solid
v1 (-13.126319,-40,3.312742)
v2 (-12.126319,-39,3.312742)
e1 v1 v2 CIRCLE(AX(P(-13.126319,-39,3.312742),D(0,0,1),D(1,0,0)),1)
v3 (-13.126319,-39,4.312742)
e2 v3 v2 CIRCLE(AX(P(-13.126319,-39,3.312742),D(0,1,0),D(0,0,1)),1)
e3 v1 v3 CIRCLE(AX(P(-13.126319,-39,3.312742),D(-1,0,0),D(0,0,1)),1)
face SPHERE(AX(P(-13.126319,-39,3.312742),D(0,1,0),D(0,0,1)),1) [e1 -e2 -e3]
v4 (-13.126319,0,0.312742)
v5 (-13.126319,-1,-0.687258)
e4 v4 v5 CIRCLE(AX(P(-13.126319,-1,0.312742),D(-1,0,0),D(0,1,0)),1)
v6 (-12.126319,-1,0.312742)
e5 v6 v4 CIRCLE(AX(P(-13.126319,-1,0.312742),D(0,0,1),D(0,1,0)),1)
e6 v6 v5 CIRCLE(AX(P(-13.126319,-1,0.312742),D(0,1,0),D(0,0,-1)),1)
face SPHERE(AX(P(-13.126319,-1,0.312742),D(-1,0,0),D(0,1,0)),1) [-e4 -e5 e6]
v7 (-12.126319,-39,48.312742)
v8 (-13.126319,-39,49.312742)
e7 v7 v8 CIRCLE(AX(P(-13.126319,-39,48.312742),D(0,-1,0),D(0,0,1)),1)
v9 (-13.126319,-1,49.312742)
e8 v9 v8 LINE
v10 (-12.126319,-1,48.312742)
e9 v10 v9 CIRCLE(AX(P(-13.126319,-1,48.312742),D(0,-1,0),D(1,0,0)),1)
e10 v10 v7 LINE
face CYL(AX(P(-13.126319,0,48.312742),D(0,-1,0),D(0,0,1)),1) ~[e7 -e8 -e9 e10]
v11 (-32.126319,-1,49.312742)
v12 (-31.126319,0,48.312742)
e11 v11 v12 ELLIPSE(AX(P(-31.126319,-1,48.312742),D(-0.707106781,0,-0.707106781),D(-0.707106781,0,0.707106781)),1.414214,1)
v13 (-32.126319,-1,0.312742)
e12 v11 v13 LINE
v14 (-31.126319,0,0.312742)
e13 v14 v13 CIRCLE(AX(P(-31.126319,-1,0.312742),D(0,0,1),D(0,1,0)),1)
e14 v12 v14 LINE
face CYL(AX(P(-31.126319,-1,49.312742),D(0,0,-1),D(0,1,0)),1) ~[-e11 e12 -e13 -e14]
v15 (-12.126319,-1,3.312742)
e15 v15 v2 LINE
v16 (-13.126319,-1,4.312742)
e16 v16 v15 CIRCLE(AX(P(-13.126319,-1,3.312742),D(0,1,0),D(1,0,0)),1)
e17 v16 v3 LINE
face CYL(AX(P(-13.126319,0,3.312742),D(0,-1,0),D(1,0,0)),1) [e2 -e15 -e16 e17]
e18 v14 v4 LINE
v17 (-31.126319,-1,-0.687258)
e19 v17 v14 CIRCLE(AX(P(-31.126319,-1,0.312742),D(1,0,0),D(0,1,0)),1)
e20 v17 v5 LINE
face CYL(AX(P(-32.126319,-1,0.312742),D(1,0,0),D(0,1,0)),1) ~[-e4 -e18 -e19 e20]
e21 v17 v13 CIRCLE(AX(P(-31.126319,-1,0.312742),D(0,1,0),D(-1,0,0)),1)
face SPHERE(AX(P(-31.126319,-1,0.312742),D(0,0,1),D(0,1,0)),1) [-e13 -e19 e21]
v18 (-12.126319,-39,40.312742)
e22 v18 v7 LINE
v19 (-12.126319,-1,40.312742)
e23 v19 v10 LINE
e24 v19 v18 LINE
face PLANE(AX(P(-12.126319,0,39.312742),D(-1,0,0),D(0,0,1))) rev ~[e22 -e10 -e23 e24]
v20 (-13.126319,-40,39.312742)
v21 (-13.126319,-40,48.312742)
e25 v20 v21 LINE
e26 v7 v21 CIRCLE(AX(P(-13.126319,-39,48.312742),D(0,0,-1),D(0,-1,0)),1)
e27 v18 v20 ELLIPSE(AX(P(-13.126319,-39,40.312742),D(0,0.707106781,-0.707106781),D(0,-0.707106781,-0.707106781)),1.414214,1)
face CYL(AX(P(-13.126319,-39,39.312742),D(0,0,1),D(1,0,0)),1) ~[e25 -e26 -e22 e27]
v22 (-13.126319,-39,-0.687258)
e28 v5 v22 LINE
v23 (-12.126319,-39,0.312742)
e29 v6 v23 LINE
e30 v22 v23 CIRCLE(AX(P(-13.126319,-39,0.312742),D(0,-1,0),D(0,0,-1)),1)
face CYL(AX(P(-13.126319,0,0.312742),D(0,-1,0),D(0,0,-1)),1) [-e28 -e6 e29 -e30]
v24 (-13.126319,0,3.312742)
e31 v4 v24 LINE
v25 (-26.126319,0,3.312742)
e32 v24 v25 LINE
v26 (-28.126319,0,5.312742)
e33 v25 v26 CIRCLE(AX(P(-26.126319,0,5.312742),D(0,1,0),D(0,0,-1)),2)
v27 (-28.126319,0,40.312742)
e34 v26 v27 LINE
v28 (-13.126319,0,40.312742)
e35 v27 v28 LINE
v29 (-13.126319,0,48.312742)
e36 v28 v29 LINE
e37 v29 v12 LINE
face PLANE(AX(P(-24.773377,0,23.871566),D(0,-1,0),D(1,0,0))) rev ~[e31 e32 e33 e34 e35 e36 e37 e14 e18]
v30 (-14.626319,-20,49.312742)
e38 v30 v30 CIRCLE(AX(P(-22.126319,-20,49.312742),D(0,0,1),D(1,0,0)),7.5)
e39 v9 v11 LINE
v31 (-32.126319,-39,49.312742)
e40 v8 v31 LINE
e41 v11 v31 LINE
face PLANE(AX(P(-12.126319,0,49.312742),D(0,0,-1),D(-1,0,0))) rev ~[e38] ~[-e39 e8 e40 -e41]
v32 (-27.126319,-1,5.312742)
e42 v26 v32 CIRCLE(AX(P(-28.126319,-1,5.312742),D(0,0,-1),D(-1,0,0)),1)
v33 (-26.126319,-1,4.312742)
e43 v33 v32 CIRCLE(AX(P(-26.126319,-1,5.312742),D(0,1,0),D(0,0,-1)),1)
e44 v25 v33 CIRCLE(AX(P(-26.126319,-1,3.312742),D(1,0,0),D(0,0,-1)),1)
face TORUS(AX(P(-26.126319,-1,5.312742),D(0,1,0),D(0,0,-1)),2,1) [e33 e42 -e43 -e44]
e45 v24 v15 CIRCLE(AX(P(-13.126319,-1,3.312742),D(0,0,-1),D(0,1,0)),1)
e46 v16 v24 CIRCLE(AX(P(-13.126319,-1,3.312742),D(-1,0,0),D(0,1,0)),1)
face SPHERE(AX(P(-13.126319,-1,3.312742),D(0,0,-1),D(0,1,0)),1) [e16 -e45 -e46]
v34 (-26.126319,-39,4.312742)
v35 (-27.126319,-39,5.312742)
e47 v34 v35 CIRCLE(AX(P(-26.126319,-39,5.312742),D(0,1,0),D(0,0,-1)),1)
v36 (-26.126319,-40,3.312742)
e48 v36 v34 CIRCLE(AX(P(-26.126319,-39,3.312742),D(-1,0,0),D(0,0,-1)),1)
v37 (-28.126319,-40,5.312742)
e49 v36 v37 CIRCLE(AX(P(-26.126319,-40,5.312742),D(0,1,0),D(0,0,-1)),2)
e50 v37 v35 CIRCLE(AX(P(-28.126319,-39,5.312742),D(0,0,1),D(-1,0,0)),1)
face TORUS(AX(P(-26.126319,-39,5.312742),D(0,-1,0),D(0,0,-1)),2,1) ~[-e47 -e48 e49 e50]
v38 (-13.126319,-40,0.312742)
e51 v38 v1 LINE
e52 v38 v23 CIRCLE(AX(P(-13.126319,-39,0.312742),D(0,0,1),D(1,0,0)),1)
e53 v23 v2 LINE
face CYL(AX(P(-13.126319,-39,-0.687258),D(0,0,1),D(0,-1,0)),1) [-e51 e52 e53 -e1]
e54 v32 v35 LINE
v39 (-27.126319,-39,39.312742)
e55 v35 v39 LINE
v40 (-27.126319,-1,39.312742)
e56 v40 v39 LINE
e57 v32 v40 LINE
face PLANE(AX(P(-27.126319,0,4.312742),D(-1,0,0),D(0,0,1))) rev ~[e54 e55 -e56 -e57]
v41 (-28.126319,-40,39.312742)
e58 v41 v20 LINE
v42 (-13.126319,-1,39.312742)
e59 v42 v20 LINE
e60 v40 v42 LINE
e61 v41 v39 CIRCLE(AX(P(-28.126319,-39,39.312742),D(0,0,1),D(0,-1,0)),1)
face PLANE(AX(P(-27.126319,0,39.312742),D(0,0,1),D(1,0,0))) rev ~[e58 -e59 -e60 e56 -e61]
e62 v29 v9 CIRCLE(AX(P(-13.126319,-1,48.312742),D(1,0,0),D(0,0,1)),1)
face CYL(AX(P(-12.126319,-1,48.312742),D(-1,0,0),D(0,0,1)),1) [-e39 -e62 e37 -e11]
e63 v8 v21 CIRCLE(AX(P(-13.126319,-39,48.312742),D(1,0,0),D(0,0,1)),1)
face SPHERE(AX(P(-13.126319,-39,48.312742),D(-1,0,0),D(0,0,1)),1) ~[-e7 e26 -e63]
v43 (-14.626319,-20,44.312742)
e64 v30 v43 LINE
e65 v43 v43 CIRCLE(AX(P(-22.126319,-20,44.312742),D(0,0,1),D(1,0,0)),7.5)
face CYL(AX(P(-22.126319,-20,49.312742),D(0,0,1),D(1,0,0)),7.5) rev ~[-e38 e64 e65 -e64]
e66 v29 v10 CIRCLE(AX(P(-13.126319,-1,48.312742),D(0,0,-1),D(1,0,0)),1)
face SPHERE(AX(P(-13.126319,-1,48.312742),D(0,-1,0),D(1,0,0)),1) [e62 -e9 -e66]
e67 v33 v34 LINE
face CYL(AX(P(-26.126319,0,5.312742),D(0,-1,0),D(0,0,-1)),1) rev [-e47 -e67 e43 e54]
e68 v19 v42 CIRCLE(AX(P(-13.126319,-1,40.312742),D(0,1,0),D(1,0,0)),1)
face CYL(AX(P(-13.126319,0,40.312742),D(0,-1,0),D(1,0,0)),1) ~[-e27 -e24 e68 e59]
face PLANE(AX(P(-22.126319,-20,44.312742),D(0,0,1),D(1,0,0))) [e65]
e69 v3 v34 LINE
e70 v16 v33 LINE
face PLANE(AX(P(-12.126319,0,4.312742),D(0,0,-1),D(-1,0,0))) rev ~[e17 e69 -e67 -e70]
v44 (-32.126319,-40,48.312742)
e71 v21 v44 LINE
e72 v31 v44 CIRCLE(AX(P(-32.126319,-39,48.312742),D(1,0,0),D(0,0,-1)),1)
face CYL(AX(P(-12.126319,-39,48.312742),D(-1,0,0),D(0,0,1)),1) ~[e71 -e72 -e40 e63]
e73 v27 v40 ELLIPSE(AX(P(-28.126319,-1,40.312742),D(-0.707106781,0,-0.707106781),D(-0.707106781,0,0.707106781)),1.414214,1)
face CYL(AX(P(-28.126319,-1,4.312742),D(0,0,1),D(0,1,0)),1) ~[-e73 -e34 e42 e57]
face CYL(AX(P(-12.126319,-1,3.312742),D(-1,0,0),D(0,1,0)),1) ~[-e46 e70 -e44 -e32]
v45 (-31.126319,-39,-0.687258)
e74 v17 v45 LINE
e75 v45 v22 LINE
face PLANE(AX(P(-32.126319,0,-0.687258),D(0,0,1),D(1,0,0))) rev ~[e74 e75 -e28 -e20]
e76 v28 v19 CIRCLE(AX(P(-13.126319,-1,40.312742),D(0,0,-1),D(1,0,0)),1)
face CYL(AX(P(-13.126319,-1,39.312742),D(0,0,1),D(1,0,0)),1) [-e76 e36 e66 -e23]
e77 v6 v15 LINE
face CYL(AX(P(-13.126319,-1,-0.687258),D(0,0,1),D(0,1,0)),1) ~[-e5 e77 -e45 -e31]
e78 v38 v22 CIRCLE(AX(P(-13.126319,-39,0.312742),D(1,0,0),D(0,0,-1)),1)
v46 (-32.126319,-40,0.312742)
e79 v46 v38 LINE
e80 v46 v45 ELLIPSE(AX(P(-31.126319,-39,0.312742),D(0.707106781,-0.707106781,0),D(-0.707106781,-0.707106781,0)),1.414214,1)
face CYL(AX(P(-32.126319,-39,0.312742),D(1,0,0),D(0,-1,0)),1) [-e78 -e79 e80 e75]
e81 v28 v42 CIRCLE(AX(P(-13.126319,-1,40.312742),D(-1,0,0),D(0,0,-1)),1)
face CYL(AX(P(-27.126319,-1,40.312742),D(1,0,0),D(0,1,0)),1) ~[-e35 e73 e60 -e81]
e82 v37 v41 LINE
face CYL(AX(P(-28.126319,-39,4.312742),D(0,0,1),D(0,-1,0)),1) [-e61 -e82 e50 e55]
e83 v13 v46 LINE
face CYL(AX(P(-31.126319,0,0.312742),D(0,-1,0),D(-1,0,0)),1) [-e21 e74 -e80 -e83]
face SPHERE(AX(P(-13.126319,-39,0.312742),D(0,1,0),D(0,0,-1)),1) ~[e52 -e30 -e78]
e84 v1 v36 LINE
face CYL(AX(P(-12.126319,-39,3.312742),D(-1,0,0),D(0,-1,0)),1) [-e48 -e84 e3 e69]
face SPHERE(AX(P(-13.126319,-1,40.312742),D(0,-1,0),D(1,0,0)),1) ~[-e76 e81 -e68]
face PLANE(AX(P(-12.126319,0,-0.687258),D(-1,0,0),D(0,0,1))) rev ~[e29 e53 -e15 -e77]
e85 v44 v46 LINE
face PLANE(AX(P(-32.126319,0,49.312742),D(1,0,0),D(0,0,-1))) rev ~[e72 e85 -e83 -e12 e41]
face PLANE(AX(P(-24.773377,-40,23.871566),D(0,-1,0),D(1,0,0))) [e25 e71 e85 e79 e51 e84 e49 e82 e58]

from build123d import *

# Parameters (mm, degrees)
F1_DEPTH = 40
F2_R     = 7.5
F3_DEPTH = 5
F4_R     = 1


with BuildPart() as f1:
    # F0 (on Front) → F1 (new body)
    with BuildSketch(Plane.XZ):
        Polygon((-12.1263185228, 49.3127419949), (-32.1263185228, 49.3127419949), (-32.1263185228, -0.6872580051), (-12.1263185228, -0.6872580051), (-12.1263185228, 4.3127419949), (-27.1263185228, 4.3127419949), (-27.1263185228, 39.3127419949), (-12.1263185228, 39.3127419949), align=None)
    extrude(amount=F1_DEPTH)

    # F2 (on face) → F3 (cut)
    with BuildSketch(Plane.XY.offset(49.3127419949)):
        with Locations((-22.1263185228, -20)):
            Circle(F2_R)
    extrude(amount=-F3_DEPTH, mode=Mode.SUBTRACT)

    # F4
    f4_edges = [f1.edges().sort_by_distance(p)[0] for p in [
        (-22.126319, -40, 49.312742),
        (-12.126319, -20, 39.312742),
        (-12.126319, -20, 49.312742),
        (-12.126319, 0, 44.312742),
        (-12.126319, -40, 44.312742),
        (-22.126319, 0, 49.312742),
        (-32.126319, 0, 24.312742),
        (-22.126319, 0, -0.687258),
        (-12.126319, 0, 1.812742),
        (-19.626319, 0, 4.312742),
        (-27.126319, 0, 21.812742),
        (-19.626319, 0, 39.312742),
        (-12.126319, -20, 4.312742),
        (-27.126319, -20, 4.312742),
        (-19.626319, -40, 4.312742),
        (-32.126319, -20, -0.687258),
        (-12.126319, -20, -0.687258),
        (-22.126319, -40, -0.687258),
        (-12.126319, -40, 1.812742),
        (-27.126319, -40, 21.812742),
    ]]
    fillet(f4_edges, radius=F4_R)


solid = f1.part
